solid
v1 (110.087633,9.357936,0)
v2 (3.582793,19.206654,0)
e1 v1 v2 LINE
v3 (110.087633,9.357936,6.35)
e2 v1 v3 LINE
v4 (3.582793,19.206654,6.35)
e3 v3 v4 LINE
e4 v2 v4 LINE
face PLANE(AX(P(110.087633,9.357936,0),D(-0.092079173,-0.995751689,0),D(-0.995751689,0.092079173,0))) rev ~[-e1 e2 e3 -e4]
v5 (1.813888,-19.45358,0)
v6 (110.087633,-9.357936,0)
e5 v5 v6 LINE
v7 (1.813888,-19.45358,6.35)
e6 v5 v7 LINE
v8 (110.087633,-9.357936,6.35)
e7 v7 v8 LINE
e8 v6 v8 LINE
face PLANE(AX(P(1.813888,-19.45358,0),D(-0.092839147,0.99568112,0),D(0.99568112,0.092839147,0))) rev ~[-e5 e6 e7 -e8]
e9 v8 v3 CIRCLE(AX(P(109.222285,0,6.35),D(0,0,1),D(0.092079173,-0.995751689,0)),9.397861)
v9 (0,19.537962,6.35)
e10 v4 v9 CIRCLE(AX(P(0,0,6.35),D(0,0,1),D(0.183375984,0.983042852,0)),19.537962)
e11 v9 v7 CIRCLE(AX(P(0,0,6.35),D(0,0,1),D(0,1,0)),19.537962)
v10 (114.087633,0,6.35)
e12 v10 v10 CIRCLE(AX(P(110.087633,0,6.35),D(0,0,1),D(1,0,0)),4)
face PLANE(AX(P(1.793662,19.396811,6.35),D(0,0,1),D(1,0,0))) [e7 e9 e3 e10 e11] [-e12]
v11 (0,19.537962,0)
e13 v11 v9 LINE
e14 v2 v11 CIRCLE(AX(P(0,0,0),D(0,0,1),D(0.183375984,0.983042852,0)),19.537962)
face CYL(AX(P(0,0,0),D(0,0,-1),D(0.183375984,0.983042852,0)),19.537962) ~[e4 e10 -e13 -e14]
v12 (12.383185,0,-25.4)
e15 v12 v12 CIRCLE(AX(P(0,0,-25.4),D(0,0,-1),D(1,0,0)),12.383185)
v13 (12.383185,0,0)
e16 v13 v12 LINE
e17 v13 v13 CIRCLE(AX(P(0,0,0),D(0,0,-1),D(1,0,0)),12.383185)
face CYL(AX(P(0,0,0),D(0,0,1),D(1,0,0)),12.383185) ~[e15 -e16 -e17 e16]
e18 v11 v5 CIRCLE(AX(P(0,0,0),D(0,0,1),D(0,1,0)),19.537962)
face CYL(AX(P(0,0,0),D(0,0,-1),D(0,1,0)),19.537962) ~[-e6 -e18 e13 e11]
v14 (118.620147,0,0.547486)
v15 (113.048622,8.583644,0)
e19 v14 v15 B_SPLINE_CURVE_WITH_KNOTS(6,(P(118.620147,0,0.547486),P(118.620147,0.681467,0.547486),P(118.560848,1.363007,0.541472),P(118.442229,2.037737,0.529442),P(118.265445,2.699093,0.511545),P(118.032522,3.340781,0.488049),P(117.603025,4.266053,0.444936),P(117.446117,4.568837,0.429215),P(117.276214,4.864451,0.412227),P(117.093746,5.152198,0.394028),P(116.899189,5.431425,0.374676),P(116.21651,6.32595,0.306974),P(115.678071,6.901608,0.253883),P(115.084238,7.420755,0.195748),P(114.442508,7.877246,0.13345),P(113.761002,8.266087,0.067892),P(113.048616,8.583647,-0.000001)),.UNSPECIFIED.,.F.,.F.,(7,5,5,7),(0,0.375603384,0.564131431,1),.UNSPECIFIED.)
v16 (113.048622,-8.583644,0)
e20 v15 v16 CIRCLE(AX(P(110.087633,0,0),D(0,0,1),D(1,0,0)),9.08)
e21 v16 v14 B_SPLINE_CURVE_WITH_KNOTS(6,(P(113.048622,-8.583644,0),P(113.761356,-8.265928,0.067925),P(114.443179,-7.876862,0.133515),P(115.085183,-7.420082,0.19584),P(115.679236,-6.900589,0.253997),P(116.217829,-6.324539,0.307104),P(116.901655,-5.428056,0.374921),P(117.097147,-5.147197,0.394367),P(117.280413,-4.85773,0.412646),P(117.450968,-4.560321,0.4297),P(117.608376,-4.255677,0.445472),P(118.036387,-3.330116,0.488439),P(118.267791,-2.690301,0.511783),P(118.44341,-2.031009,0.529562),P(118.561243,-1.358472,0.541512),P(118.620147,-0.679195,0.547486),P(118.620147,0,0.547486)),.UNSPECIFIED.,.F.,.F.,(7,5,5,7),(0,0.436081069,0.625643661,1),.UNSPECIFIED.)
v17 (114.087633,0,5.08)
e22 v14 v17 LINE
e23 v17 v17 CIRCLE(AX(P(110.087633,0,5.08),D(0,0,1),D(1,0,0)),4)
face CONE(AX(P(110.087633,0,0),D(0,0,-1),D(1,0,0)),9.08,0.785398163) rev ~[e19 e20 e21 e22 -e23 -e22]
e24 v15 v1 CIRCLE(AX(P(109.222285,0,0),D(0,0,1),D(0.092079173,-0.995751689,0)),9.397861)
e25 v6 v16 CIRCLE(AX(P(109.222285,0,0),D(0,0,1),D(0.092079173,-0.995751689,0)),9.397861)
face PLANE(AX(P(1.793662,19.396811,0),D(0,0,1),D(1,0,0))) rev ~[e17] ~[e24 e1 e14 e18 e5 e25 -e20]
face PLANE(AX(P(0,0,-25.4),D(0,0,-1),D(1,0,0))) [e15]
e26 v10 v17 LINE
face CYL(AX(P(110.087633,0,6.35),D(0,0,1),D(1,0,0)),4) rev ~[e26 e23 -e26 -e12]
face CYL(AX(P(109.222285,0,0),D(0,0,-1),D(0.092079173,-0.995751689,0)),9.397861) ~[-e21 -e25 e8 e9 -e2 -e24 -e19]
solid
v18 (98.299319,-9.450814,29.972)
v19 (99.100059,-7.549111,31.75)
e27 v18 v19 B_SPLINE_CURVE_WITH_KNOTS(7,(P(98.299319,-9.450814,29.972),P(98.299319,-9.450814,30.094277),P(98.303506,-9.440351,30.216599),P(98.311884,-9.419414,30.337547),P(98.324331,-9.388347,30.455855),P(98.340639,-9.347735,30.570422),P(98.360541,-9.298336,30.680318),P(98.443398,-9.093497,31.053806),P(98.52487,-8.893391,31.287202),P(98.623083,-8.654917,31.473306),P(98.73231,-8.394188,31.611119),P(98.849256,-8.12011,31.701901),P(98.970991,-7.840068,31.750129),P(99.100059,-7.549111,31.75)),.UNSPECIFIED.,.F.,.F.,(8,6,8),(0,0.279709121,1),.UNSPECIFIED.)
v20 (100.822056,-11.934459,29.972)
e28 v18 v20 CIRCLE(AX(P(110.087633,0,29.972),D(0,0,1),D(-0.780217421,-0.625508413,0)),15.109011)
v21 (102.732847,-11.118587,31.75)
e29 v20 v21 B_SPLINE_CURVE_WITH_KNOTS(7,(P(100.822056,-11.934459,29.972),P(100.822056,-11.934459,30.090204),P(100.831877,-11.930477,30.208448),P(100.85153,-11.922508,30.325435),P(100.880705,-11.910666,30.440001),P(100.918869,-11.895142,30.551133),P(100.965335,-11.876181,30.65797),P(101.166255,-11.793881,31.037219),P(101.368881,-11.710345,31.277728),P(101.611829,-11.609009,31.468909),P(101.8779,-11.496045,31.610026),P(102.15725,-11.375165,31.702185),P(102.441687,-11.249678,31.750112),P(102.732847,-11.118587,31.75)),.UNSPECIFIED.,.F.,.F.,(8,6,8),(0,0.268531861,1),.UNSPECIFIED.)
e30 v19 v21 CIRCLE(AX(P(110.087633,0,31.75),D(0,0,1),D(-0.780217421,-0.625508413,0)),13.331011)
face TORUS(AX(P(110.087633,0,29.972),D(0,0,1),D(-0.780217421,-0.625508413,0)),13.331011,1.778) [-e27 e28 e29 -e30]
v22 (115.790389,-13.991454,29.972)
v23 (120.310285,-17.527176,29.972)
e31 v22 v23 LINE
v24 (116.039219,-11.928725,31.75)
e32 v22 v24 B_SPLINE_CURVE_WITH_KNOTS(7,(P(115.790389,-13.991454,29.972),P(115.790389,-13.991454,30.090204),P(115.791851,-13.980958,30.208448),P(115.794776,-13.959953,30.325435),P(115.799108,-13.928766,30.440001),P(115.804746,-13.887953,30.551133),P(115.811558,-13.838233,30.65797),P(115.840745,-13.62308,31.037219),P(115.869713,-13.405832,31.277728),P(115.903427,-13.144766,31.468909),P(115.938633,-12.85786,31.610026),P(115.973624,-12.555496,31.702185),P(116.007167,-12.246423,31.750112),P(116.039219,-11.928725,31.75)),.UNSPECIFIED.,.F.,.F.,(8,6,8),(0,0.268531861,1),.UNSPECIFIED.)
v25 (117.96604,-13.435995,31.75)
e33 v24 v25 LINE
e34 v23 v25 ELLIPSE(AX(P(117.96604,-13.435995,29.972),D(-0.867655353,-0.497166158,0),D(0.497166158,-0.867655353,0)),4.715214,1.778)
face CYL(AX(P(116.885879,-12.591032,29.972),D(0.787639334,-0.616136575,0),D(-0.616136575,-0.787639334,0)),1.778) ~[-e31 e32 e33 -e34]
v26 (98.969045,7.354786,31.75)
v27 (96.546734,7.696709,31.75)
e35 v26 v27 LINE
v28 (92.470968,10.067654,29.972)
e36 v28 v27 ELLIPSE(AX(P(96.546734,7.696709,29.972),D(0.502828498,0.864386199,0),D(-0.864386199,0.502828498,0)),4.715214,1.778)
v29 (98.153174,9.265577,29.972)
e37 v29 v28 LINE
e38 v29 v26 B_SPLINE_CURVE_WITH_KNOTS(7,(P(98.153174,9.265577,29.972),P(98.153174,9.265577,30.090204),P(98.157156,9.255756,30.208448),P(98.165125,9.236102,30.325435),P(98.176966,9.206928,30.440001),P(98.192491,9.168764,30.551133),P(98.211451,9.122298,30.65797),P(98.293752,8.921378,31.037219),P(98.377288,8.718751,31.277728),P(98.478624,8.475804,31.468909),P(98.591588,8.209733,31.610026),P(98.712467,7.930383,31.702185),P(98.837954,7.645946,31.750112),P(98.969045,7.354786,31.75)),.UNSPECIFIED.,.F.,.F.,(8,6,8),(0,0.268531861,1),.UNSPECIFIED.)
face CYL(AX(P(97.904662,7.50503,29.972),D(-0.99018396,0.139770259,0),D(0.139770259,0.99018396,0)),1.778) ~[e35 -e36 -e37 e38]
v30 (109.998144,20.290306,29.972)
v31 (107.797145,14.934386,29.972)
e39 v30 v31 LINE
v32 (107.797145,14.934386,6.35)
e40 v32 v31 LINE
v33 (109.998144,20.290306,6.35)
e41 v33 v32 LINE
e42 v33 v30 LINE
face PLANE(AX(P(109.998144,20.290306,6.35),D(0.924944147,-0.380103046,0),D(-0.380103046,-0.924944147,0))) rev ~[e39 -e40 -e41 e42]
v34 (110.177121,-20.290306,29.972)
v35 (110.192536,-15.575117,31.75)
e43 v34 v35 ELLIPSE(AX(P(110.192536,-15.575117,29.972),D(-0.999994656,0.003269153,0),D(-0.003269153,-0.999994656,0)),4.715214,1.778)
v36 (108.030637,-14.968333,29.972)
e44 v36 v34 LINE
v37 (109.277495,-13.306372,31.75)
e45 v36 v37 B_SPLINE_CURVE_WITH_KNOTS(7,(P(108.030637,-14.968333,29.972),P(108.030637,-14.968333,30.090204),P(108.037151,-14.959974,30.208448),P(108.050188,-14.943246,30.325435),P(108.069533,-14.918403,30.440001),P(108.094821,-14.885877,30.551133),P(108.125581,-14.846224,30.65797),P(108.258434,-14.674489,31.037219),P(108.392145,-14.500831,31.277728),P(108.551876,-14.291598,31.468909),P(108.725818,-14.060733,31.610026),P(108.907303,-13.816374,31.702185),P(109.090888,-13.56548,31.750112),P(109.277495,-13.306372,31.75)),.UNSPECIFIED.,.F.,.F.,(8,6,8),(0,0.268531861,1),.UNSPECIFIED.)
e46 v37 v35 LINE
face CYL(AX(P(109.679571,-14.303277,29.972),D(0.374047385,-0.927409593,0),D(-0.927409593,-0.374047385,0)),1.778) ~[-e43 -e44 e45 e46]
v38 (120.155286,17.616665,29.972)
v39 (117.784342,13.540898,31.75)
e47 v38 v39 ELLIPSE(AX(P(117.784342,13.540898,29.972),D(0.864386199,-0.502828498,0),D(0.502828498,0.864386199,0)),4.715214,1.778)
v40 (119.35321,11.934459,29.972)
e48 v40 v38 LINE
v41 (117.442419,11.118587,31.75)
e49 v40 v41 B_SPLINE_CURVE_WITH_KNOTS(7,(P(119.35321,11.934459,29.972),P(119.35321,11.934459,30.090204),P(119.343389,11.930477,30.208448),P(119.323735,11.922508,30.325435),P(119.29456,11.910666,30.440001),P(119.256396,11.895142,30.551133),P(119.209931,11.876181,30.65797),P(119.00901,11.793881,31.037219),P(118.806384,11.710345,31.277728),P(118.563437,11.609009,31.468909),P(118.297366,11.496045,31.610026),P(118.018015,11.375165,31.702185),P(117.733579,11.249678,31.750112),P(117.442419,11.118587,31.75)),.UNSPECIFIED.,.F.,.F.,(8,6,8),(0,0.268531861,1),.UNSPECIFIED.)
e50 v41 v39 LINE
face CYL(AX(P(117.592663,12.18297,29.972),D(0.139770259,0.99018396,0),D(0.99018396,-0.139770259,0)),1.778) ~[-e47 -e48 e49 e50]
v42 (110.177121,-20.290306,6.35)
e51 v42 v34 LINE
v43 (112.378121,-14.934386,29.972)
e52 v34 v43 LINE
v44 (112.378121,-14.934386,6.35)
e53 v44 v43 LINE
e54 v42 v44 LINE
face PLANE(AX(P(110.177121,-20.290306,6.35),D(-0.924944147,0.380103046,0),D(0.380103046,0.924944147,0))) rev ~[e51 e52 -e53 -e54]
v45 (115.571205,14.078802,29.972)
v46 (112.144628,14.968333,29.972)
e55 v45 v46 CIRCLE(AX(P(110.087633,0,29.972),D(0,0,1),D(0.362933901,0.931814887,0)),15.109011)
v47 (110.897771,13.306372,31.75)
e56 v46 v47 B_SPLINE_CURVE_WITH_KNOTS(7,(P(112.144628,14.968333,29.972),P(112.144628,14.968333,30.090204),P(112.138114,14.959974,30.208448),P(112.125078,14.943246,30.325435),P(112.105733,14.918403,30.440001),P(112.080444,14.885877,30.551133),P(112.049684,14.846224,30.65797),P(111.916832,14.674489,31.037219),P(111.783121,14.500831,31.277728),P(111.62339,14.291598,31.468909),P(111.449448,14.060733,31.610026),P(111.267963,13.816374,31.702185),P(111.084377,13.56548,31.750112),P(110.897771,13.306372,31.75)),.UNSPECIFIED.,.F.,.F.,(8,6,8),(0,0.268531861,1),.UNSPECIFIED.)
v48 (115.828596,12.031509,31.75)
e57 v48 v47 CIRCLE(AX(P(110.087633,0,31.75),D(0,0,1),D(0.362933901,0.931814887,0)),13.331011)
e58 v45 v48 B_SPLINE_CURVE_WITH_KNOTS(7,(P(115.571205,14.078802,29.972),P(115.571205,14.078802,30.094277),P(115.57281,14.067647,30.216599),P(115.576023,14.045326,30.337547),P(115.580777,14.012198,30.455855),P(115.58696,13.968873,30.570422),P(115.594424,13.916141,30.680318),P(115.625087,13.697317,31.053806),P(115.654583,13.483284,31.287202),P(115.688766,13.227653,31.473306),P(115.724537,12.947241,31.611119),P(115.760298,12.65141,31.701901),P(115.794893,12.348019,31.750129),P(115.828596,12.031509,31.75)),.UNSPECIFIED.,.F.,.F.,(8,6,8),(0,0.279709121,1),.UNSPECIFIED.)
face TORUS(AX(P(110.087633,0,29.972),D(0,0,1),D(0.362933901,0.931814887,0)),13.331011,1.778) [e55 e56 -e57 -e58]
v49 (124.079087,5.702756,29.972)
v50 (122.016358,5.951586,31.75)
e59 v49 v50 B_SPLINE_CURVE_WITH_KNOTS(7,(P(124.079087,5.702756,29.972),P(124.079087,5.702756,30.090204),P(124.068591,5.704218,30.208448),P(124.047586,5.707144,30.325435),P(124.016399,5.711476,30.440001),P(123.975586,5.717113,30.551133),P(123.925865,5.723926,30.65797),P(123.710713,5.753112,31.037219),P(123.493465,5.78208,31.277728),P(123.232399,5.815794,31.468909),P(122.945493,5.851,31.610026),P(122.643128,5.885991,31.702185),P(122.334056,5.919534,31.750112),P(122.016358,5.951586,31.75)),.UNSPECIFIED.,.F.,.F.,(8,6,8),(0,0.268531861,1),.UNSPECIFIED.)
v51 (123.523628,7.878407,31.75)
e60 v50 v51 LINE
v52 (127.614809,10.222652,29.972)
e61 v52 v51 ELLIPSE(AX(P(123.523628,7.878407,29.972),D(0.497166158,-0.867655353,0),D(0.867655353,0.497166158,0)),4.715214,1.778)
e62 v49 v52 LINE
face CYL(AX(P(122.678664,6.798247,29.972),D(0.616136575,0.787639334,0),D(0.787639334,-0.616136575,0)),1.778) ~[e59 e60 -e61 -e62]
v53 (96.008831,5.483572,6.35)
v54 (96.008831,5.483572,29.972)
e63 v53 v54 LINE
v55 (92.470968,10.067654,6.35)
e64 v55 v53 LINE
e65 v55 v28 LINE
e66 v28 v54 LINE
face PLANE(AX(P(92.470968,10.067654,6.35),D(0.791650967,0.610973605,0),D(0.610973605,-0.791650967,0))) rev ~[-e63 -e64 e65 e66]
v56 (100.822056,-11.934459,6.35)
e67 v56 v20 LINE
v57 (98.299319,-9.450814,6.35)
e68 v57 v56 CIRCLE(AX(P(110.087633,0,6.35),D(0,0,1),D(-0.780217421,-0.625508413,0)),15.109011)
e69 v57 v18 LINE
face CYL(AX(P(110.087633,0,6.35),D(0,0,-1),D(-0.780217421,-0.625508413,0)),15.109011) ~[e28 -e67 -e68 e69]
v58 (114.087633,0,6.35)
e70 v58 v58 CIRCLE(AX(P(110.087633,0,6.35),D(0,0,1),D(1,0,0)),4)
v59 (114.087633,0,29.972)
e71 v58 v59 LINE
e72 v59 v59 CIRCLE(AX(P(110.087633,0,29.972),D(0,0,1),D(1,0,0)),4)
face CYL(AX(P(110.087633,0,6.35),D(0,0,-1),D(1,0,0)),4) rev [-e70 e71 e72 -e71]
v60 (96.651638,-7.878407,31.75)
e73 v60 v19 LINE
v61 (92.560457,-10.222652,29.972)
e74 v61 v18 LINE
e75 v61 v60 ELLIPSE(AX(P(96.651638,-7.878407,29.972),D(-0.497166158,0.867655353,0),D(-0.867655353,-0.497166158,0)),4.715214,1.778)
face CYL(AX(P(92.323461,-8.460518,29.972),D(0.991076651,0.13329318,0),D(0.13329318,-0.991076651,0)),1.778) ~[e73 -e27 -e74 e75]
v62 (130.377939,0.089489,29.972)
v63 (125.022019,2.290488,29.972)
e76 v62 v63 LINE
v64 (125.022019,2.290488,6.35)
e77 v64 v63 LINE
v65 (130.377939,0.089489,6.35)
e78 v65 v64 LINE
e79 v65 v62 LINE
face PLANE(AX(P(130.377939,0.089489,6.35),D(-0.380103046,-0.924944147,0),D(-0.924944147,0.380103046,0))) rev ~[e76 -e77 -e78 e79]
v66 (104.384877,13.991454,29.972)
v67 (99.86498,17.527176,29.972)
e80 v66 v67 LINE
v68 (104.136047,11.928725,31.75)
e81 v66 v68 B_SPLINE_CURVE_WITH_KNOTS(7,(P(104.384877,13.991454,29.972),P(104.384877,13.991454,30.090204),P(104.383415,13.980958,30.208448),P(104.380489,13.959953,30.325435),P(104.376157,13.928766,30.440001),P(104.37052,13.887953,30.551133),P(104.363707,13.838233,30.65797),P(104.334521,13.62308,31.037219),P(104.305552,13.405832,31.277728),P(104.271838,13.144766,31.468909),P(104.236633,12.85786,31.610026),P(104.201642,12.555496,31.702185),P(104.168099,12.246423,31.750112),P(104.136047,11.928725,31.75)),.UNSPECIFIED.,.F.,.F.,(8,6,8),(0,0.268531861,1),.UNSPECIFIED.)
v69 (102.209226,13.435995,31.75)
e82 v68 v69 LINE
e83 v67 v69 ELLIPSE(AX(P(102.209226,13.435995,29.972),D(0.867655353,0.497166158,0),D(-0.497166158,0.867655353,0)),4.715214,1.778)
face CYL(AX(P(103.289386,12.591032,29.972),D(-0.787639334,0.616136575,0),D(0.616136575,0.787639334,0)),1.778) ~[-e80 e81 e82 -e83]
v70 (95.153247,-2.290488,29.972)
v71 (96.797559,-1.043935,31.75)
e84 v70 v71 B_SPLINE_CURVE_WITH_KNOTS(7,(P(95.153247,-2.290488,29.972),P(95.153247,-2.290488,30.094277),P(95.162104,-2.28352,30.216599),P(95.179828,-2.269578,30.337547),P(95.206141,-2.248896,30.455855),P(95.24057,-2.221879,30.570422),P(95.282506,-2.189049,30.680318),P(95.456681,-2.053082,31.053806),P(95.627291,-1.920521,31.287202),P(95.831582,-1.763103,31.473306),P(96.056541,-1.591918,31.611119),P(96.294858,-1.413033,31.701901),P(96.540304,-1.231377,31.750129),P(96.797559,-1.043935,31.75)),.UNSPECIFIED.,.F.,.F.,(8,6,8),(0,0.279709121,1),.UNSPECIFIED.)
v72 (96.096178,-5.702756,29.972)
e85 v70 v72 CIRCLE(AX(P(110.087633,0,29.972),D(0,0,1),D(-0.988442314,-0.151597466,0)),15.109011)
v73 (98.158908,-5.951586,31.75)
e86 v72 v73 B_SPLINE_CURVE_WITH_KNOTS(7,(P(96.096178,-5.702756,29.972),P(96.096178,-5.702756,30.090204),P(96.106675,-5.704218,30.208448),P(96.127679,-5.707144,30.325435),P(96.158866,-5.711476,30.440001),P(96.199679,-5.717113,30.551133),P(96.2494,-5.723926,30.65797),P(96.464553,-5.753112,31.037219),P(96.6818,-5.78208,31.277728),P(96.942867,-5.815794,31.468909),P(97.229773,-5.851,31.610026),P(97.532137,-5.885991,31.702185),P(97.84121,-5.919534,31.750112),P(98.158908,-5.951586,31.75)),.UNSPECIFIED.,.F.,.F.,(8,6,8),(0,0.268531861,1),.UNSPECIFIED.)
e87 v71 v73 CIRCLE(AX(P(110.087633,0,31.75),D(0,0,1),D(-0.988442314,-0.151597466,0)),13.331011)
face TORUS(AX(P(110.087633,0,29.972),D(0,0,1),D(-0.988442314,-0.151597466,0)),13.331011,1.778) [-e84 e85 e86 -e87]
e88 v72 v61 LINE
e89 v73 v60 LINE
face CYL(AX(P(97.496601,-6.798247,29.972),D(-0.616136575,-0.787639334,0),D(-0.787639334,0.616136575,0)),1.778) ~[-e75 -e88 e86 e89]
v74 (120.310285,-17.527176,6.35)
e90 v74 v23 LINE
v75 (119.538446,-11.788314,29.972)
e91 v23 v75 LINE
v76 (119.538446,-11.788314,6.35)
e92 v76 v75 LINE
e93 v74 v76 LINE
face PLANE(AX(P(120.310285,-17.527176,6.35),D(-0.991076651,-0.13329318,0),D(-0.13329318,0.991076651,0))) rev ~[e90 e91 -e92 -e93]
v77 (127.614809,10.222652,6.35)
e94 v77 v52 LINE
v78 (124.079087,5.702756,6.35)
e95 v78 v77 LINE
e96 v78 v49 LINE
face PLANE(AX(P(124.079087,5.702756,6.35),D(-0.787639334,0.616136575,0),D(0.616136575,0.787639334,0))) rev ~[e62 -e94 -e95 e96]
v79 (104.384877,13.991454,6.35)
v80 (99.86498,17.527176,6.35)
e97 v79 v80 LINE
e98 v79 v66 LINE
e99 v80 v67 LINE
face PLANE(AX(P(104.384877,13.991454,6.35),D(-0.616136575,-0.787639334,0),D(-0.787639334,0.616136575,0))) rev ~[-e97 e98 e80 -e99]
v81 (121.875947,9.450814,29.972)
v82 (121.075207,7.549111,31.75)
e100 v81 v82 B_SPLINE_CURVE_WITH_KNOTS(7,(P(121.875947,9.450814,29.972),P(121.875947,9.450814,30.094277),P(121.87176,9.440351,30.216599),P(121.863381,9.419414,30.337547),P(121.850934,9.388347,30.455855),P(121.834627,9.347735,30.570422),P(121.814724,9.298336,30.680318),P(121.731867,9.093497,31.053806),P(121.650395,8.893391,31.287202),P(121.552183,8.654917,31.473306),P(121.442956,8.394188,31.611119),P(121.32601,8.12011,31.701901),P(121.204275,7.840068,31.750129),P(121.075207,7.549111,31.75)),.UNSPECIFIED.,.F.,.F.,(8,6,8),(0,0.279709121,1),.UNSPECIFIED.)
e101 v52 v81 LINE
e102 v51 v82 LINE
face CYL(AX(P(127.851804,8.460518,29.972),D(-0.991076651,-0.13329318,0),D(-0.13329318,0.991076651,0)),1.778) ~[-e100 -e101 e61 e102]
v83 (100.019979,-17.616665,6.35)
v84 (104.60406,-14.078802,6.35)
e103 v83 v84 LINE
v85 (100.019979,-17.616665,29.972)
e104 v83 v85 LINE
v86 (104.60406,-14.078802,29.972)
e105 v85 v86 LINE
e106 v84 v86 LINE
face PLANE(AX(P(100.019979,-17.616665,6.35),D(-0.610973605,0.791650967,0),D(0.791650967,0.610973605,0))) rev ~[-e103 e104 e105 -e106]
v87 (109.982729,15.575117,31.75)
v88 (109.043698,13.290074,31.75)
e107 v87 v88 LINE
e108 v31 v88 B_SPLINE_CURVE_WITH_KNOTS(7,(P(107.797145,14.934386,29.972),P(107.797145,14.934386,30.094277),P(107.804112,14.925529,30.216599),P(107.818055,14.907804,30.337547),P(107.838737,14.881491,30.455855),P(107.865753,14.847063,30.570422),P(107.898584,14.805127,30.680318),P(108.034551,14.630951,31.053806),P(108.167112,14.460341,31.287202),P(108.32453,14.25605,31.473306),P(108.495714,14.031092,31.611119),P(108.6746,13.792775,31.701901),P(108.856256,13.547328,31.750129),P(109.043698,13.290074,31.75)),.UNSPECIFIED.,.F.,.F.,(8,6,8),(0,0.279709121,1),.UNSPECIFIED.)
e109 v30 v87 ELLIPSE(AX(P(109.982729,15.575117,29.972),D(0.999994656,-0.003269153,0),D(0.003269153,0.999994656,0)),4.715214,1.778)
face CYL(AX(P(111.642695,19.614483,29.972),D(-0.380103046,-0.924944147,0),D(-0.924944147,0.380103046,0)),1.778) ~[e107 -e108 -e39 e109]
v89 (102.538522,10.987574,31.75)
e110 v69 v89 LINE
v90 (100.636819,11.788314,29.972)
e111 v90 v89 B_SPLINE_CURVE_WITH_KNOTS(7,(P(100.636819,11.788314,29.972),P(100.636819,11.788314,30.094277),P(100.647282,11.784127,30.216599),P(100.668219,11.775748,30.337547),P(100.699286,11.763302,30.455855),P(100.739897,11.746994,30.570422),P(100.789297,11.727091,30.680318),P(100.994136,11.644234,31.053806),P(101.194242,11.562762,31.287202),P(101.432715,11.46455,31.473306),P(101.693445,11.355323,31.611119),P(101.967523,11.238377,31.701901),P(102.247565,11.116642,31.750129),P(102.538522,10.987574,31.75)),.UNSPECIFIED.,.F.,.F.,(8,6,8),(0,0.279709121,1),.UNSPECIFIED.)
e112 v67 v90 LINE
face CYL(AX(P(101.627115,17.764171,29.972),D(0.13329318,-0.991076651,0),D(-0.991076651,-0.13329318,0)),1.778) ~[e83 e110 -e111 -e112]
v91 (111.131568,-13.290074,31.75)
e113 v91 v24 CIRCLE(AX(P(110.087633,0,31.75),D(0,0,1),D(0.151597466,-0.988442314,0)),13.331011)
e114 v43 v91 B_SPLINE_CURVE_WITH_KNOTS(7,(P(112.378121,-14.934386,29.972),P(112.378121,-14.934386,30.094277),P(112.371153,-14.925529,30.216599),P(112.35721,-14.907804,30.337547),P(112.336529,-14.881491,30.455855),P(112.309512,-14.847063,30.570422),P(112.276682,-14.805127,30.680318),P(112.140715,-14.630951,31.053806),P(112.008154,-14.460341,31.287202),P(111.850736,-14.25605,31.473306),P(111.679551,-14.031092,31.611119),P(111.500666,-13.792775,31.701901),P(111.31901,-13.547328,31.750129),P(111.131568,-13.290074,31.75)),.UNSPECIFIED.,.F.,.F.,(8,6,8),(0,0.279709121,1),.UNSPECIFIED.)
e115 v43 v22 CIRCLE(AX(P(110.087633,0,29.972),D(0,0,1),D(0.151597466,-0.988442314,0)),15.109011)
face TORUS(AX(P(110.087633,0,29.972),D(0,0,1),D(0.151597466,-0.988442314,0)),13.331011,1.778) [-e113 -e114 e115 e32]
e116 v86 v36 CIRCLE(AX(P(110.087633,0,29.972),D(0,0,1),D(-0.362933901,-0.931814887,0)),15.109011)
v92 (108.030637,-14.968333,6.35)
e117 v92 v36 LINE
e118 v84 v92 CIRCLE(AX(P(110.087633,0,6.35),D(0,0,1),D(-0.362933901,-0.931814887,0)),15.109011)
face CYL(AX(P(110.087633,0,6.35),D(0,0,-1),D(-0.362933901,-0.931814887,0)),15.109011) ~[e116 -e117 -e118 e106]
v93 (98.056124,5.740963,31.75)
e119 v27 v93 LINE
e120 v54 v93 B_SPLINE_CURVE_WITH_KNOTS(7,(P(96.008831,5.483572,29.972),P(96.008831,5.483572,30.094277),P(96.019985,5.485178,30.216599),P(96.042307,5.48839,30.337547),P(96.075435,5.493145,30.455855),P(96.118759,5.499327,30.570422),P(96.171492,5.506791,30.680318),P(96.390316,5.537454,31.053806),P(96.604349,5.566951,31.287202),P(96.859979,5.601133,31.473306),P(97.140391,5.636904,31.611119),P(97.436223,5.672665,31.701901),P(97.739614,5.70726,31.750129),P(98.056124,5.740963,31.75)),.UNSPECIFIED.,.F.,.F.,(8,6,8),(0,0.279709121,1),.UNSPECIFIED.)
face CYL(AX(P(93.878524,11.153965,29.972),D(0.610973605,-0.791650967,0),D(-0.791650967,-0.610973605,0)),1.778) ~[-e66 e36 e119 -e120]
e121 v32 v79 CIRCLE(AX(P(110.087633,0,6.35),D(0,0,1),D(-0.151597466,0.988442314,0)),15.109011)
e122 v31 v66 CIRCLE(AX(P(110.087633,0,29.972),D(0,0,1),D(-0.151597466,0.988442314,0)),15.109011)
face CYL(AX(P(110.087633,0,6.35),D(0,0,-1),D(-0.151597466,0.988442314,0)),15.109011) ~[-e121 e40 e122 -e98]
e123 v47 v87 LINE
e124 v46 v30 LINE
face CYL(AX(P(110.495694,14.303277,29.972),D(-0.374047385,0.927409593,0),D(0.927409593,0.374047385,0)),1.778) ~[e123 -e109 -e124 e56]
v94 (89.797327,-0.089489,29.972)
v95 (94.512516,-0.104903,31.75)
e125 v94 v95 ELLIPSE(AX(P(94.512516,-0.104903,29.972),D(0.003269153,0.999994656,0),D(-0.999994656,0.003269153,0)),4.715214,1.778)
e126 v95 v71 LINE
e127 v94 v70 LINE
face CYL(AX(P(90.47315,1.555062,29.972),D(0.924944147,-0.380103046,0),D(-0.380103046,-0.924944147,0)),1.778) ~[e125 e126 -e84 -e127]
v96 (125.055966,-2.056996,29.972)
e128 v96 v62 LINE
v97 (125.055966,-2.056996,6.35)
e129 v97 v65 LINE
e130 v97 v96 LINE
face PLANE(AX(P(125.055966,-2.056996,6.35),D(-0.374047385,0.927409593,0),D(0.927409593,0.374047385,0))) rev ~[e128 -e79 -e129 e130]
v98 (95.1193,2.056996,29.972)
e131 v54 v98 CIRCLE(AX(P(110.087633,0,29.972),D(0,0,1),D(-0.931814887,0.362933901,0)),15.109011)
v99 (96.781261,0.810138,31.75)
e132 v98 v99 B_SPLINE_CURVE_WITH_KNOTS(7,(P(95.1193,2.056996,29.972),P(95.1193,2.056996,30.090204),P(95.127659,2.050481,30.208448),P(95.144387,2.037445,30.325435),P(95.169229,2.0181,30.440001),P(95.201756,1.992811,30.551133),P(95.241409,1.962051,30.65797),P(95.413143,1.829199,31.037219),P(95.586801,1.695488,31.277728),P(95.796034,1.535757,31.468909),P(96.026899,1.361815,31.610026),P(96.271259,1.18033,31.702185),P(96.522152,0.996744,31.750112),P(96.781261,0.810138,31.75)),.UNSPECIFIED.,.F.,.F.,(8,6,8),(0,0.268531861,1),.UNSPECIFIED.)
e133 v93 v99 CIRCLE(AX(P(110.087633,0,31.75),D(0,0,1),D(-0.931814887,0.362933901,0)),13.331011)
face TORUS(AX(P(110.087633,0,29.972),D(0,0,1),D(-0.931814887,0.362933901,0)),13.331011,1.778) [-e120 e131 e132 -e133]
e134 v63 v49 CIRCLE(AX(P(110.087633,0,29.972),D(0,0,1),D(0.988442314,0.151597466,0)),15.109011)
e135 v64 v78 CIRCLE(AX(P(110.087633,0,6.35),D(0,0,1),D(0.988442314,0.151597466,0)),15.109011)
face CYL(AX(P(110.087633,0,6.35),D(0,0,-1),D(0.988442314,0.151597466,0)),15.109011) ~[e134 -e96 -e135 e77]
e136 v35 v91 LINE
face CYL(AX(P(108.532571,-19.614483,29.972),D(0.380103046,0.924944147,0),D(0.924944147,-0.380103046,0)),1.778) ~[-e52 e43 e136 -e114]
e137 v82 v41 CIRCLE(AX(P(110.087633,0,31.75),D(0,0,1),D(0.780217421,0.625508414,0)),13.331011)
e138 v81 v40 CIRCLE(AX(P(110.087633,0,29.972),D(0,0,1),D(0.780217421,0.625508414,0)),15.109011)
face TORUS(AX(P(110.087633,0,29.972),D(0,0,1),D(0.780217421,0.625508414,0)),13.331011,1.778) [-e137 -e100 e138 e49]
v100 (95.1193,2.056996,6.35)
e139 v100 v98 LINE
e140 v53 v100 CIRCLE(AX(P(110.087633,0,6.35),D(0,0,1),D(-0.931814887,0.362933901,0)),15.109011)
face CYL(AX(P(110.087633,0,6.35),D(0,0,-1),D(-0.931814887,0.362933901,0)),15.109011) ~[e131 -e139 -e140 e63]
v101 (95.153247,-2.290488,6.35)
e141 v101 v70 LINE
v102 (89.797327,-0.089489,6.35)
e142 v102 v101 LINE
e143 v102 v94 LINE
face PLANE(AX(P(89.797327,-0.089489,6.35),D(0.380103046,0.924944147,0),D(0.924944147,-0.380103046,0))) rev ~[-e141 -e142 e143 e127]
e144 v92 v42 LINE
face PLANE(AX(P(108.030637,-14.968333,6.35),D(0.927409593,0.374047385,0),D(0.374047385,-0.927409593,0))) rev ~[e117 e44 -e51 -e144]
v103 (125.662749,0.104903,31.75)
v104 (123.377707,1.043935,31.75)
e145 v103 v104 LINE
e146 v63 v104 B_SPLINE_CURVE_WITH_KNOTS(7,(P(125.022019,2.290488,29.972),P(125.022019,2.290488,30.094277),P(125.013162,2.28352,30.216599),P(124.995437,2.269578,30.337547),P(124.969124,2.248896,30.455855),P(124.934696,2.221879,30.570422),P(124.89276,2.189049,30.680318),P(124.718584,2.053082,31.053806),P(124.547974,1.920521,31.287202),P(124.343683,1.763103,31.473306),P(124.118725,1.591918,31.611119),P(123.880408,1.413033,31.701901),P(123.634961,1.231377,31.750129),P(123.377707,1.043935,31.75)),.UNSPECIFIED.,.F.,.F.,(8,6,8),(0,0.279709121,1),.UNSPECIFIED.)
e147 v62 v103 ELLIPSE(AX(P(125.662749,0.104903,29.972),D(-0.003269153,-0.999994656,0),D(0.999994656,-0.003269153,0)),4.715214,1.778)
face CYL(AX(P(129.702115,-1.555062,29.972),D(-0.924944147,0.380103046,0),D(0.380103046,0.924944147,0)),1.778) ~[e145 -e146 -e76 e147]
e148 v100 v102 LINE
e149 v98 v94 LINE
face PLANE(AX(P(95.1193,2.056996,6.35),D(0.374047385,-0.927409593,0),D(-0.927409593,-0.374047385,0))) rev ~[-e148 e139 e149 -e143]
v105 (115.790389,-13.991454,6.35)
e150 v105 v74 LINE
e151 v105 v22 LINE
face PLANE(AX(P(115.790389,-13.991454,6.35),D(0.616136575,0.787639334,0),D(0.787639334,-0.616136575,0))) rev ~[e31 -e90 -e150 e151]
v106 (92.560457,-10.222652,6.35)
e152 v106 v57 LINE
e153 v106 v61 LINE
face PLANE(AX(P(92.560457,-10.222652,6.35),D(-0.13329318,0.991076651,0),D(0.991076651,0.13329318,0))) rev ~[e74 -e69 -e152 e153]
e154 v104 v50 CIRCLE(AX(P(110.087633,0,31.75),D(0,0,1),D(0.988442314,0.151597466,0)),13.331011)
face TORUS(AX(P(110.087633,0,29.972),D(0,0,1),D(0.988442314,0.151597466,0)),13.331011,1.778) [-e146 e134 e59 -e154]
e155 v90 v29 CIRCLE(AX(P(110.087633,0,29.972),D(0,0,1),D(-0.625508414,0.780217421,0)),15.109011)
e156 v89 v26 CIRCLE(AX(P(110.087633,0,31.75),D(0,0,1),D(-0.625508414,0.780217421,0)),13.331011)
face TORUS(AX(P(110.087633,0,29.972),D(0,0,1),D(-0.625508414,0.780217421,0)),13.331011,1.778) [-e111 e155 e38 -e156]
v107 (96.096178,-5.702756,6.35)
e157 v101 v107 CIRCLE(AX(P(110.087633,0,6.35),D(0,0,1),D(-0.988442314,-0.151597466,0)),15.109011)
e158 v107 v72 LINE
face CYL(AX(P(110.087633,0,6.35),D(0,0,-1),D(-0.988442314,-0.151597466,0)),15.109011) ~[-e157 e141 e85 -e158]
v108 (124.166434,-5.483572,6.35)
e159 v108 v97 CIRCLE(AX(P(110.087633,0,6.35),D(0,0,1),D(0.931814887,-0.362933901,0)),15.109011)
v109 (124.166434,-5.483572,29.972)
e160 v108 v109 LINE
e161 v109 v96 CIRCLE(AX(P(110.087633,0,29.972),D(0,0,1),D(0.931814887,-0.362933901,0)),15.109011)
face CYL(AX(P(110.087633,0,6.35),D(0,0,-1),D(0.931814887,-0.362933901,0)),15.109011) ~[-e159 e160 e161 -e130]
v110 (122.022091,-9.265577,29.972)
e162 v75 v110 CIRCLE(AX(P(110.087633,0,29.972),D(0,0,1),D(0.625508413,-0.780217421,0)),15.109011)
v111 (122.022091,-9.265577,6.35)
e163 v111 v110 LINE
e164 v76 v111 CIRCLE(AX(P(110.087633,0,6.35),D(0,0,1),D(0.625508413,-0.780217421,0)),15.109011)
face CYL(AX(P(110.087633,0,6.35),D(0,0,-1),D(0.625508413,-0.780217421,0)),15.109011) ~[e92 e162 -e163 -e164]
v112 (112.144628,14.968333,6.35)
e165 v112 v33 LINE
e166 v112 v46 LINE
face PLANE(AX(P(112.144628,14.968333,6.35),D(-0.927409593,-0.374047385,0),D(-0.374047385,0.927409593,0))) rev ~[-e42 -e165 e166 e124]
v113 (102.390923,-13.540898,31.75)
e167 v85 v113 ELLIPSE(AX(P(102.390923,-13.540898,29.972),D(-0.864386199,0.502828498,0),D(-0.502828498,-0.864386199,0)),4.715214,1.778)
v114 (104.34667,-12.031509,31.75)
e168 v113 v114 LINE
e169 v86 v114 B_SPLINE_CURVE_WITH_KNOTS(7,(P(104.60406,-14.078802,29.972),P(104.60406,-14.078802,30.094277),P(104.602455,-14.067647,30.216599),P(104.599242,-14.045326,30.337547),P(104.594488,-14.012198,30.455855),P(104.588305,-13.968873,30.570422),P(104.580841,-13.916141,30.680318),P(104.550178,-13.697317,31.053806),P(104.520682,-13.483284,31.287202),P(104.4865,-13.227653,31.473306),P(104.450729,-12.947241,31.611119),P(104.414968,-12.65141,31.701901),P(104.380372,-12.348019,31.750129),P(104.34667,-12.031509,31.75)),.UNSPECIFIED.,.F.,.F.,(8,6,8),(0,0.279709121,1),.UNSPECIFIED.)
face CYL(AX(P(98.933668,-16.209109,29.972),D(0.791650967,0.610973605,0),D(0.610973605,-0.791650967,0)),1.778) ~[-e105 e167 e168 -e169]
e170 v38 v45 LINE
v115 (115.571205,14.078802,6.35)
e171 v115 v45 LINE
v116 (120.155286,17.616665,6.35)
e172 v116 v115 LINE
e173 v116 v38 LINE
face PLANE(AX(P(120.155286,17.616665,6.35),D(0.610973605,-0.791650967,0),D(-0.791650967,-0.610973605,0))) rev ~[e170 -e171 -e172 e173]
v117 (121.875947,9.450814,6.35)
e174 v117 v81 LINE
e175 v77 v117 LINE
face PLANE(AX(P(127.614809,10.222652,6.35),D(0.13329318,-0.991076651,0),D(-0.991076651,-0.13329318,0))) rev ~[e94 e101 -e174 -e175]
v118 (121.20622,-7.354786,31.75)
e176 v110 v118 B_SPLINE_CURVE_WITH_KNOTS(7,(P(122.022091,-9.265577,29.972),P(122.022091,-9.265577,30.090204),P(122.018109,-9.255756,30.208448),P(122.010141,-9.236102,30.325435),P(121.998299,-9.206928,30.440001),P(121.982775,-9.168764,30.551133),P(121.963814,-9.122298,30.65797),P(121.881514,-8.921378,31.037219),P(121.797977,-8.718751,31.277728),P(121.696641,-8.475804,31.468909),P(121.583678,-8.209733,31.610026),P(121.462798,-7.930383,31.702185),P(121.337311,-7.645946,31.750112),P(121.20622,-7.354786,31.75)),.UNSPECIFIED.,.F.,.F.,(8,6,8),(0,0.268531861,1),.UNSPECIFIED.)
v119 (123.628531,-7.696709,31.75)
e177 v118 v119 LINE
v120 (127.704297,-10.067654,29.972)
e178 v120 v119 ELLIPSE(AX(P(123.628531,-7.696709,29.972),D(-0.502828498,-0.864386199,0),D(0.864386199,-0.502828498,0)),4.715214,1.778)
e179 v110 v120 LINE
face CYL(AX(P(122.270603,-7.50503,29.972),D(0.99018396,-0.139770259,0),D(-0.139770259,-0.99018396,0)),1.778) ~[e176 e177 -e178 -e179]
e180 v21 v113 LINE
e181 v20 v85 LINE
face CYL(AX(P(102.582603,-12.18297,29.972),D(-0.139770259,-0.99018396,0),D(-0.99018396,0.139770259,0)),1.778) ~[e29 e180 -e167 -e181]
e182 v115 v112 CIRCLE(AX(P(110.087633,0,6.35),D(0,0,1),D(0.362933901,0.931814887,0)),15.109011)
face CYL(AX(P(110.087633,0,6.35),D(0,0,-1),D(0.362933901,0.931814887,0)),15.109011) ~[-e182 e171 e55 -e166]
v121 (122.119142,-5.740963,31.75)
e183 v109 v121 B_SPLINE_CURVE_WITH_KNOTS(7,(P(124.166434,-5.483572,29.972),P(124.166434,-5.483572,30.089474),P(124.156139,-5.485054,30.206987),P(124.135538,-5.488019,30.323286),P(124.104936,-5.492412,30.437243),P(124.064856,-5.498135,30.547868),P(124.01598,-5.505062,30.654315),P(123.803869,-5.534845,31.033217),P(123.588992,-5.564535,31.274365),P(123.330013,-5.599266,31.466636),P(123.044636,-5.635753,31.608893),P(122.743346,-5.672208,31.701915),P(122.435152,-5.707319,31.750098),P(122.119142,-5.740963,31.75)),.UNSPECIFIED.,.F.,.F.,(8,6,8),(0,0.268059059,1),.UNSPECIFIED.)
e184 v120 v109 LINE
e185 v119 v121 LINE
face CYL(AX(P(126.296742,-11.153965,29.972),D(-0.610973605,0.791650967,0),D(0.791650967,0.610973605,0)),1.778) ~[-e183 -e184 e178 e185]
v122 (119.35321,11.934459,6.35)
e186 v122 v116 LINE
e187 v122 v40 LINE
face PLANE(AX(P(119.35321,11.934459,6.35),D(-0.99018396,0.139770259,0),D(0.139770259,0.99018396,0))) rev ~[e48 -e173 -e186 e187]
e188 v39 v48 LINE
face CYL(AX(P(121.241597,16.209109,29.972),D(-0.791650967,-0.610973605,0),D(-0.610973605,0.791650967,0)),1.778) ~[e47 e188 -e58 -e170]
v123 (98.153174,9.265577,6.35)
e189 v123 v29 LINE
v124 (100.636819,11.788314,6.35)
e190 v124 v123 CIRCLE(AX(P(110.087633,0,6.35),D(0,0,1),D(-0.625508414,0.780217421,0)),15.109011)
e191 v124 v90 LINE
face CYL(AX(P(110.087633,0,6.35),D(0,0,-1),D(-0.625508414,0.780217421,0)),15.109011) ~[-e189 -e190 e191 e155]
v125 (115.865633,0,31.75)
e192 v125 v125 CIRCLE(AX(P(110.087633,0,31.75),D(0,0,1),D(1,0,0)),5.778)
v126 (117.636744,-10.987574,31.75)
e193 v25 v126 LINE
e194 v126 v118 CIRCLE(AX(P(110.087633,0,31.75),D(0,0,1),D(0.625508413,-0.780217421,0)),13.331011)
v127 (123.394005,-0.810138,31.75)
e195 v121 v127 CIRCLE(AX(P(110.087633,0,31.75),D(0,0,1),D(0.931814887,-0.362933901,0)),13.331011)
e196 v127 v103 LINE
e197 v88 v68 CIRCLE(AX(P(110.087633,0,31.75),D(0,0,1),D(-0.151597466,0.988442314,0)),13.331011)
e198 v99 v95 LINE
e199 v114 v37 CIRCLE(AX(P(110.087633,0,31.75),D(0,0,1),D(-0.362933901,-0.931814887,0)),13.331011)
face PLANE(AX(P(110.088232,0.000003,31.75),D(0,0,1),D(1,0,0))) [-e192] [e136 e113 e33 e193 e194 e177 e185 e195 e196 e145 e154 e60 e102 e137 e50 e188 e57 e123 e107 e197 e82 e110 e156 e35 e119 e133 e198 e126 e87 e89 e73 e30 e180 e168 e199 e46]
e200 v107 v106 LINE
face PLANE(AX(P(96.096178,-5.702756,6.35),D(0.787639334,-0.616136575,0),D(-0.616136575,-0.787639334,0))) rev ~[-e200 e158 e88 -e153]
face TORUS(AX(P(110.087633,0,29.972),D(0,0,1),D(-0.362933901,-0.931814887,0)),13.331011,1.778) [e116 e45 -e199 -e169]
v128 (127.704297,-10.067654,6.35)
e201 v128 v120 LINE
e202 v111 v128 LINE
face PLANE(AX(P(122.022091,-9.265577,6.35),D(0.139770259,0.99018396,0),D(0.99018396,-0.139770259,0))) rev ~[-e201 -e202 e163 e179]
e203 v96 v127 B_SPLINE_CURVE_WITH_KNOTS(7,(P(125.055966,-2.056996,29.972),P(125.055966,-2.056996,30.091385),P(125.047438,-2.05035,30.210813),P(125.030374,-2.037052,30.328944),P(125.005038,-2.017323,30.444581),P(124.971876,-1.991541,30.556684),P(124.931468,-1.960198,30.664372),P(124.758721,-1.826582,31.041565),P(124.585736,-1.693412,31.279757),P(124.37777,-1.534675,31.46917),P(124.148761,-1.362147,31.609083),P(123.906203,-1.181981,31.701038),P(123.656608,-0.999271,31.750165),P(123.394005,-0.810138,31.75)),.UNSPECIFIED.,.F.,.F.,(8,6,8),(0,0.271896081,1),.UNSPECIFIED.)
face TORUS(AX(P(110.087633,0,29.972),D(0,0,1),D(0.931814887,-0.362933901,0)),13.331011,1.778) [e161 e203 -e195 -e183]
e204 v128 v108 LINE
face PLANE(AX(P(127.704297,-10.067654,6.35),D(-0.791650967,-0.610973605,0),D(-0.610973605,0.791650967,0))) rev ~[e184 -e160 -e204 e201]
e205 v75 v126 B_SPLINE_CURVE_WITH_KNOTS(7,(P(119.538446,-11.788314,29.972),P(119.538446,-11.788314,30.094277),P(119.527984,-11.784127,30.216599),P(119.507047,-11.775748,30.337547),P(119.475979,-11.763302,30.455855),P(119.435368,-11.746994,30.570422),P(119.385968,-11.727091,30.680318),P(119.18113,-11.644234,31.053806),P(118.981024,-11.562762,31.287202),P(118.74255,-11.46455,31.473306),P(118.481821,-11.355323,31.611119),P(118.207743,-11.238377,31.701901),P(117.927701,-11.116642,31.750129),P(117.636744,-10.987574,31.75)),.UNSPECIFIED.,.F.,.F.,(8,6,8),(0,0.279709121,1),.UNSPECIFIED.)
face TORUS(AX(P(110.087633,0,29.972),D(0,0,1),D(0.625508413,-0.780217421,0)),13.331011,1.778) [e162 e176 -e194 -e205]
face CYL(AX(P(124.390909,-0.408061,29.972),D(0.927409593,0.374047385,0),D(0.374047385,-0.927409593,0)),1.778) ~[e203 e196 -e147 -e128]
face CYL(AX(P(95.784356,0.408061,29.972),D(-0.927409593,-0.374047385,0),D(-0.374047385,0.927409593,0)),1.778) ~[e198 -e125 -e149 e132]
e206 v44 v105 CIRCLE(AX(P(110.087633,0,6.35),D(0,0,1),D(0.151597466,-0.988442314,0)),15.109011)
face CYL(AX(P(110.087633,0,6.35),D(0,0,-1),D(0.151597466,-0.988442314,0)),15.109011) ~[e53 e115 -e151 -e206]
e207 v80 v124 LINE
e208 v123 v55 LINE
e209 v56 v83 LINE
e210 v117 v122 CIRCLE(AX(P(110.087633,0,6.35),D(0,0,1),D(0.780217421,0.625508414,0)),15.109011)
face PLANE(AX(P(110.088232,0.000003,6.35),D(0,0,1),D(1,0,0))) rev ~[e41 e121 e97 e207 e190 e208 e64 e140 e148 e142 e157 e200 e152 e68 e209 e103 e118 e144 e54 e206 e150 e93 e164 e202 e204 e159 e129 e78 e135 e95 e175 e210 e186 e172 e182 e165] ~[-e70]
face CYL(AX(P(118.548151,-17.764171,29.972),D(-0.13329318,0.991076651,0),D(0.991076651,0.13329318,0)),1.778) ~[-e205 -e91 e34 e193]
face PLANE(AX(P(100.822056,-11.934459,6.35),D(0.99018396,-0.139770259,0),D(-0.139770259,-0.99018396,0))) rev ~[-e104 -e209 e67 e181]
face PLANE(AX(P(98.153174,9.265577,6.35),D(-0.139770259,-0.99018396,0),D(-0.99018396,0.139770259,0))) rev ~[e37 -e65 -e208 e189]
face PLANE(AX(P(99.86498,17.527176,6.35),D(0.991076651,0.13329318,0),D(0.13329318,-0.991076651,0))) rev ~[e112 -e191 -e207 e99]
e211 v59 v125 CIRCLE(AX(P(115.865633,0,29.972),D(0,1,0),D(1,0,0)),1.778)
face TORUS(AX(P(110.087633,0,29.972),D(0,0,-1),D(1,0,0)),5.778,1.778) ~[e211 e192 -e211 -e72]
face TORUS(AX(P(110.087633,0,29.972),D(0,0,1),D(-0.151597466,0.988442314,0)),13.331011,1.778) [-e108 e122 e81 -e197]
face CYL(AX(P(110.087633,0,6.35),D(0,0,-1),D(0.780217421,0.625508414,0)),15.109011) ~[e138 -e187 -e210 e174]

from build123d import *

# Parameters (mm, degrees)
F1_DEPTH = 6.35
F2_R     = 4
F3_DEPTH = 25.4
F5_R     = 12.3831854663
F6_DEPTH = 25.4
F7_R     = 4
F8_DEPTH = 25.4
F9_R     = 1.778


# Not quite as in the source:
# - a fillet or chamfer that OpenCascade refuses, or shapes differently, is made with other operations: its cross-section is extruded or revolved along the edge and cut away or added


with BuildPart() as f1:
    # F0 (on Top) → F1 (new body)
    with BuildSketch(Plane.XY):
        with BuildLine():
            Line((0, 19.5379621843), (3.5827930435, 19.2066540637))
            ThreePointArc((3.5827930435, 19.2066540637), (1.7990394008, 19.4549588422), (0, 19.5379621843))
        make_face()
        with BuildLine():
            Line((110.0876327298, 9.3579360824), (3.5827930435, 19.2066540637))
            Line((3.5827930435, 19.2066540637), (0, 19.5379621843))
            ThreePointArc((0, 19.5379621843), (-19.5168552551, -0.9079247047), (1.813887741, -19.453580071))
            Line((1.8138877409, -19.453580071), (110.0876327298, -9.3579360824))
            ThreePointArc((110.0876327298, -9.3579360824), (118.6201465698, 0), (110.0876327298, 9.3579360824))
        make_face()
    extrude(amount=F1_DEPTH)

    # F2 (on face) → F3 (cut)
    with BuildSketch(Plane.XY.offset(6.35)):
        with Locations((110.0876327298, 0)):
            Circle(F2_R)
    extrude(amount=-F3_DEPTH, mode=Mode.SUBTRACT)

    # F4: chamfer of 5.08 on 1 edges, made by hand

    # F4_s1 → F4_t2 (revolve, cut)
    with BuildSketch(Plane.XZ):
        Polygon((119.1676327298, 0), (114.0876327298, 5.08), (114.0876327298, 0), align=None)
    revolve(axis=Axis((110.0876327298, 0, 0), (0, 0, 1)), mode=Mode.SUBTRACT)

    # F5 (on face) → F6 (join)
    with BuildSketch(Plane(origin=(0, 0, 0), x_dir=(1, 0, 0), z_dir=(0, 0, -1))):
        Circle(F5_R)
    extrude(amount=F6_DEPTH)


with BuildPart() as f8:
    # F7 (on face) → F8 (new body)
    with BuildSketch(Plane.XY.offset(6.35)):
        with BuildLine():
            ThreePointArc((125.0559656513, -2.0569956955), (125.1614333891, -1.0309002972), (125.1966440058, 0))
            ThreePointArc((125.1966440058, 0), (125.1529244508, 1.1485674127), (125.0220188001, 2.2904878178))
            ThreePointArc((125.0220188001, 2.2904878178), (124.6508382593, 4.0243342858), (124.0790871399, 5.7027559329))
            ThreePointArc((124.0790871399, 5.7027559329), (123.1130347073, 7.656443369), (121.8759465477, 9.4508136724))
            ThreePointArc((121.8759465477, 9.4508136724), (120.687571536, 10.7667784895), (119.3532097183, 11.9344587145))
            ThreePointArc((119.3532097183, 11.9344587145), (117.5397400523, 13.143375449), (115.5712051277, 14.0788016356))
            ThreePointArc((115.5712051277, 14.0788016356), (113.8840597698, 14.624273092), (112.1446284253, 14.9683329214))
            ThreePointArc((112.1446284253, 14.9683329214), (109.9696592584, 15.1085506915), (107.797144912, 14.9343860702))
            ThreePointArc((107.797144912, 14.9343860702), (106.0632984441, 14.5632055295), (104.3848767969, 13.99145441))
            ThreePointArc((104.3848767969, 13.99145441), (102.4311893608, 13.0254019775), (100.6368190574, 11.7883138179))
            ThreePointArc((100.6368190574, 11.7883138179), (99.3208542403, 10.5999388062), (98.1531740153, 9.2655769885))
            ThreePointArc((98.1531740153, 9.2655769885), (96.9442572809, 7.4521073225), (96.0088310942, 5.4835723979))
            ThreePointArc((96.0088310942, 5.4835723979), (95.4633596378, 3.79642704), (95.1192998084, 2.0569956955))
            ThreePointArc((95.1192998084, 2.0569956955), (94.9790820383, -0.1179734715), (95.1532466596, -2.2904878178))
            ThreePointArc((95.1532466596, -2.2904878178), (95.5244272003, -4.0243342858), (96.0961783198, -5.7027559329))
            ThreePointArc((96.0961783198, -5.7027559329), (97.0622307523, -7.656443369), (98.299318912, -9.4508136724))
            ThreePointArc((98.299318912, -9.4508136724), (99.4876939236, -10.7667784895), (100.8220557413, -11.9344587145))
            ThreePointArc((100.8220557413, -11.9344587145), (102.6355254073, -13.143375449), (104.604060332, -14.0788016356))
            ThreePointArc((104.604060332, -14.0788016356), (106.2912056898, -14.624273092), (108.0306370343, -14.9683329214))
            ThreePointArc((108.0306370343, -14.9683329214), (110.2056062013, -15.1085506915), (112.3781205476, -14.9343860702))
            ThreePointArc((112.3781205476, -14.9343860702), (114.1119670156, -14.5632055295), (115.7903886627, -13.99145441))
            ThreePointArc((115.7903886627, -13.99145441), (117.7440760988, -13.0254019775), (119.5384464022, -11.7883138179))
            ThreePointArc((119.5384464022, -11.7883138179), (120.8544112194, -10.5999388062), (122.0220914443, -9.2655769885))
            ThreePointArc((122.0220914443, -9.2655769885), (123.2310081788, -7.4521073225), (124.1664343655, -5.4835723979))
            ThreePointArc((124.1664343655, -5.4835723979), (124.7119058218, -3.79642704), (125.0559656513, -2.0569956955))
        make_face()
        with Locations((110.0876327298, 0)):
            Circle(F7_R, mode=Mode.SUBTRACT)
        with BuildLine():
            ThreePointArc((125.0220188001, 2.2904878178), (125.1529244508, 1.1485674127), (125.1966440058, 0))
            ThreePointArc((125.1966440058, 0), (125.1614333891, -1.0309002972), (125.0559656513, -2.0569956955))
            Line((125.0559656513, -2.0569956955), (130.3779385678, 0.0894885204))
            Line((130.3779385678, 0.0894885204), (125.0220188001, 2.2904878178))
        make_face()
        with BuildLine():
            ThreePointArc((121.8759465477, 9.4508136724), (123.1130347073, 7.656443369), (124.0790871399, 5.7027559329))
            Line((124.0790871399, 5.7027559329), (127.6148087759, 10.222652251))
            Line((127.6148087759, 10.222652251), (121.8759465477, 9.4508136724))
        make_face()
        with BuildLine():
            Line((127.7042972963, -10.067653587), (124.1664343655, -5.4835723979))
            ThreePointArc((124.1664343655, -5.4835723979), (123.2310081788, -7.4521073225), (122.0220914443, -9.2655769885))
            Line((122.0220914443, -9.2655769885), (127.7042972963, -10.067653587))
        make_face()
        with BuildLine():
            ThreePointArc((115.5712051277, 14.0788016356), (117.5397400523, 13.143375449), (119.3532097183, 11.9344587145))
            Line((119.3532097183, 11.9344587145), (120.1552863168, 17.6166645665))
            Line((120.1552863168, 17.6166645665), (115.5712051277, 14.0788016356))
        make_face()
        with BuildLine():
            Line((120.3102849809, -17.527176046), (119.5384464022, -11.7883138179))
            ThreePointArc((119.5384464022, -11.7883138179), (117.7440760988, -13.0254019775), (115.7903886627, -13.99145441))
            Line((115.7903886627, -13.99145441), (120.3102849809, -17.527176046))
        make_face()
        with BuildLine():
            ThreePointArc((107.797144912, 14.9343860702), (109.9696592584, 15.1085506915), (112.1446284253, 14.9683329214))
            Line((112.1446284253, 14.9683329214), (109.9981442094, 20.290305838))
            Line((109.9981442094, 20.290305838), (107.797144912, 14.9343860702))
        make_face()
        with BuildLine():
            Line((110.1771212503, -20.290305838), (112.3781205476, -14.9343860702))
            ThreePointArc((112.3781205476, -14.9343860702), (110.2056062013, -15.1085506915), (108.0306370343, -14.9683329214))
            Line((108.0306370343, -14.9683329214), (110.1771212503, -20.290305838))
        make_face()
        with BuildLine():
            ThreePointArc((100.6368190574, 11.7883138179), (102.4311893608, 13.0254019775), (104.3848767969, 13.99145441))
            Line((104.3848767969, 13.99145441), (99.8649804788, 17.527176046))
            Line((99.8649804788, 17.527176046), (100.6368190574, 11.7883138179))
        make_face()
        with BuildLine():
            Line((100.0199791429, -17.6166645665), (104.604060332, -14.0788016356))
            ThreePointArc((104.604060332, -14.0788016356), (102.6355254073, -13.143375449), (100.8220557413, -11.9344587145))
            Line((100.8220557413, -11.9344587145), (100.0199791429, -17.6166645665))
        make_face()
        with BuildLine():
            ThreePointArc((96.0088310942, 5.4835723979), (96.9442572809, 7.4521073225), (98.1531740153, 9.2655769885))
            Line((98.1531740153, 9.2655769885), (92.4709681633, 10.067653587))
            Line((92.4709681633, 10.067653587), (96.0088310942, 5.4835723979))
        make_face()
        with BuildLine():
            Line((92.5604566838, -10.222652251), (98.299318912, -9.4508136724))
            ThreePointArc((98.299318912, -9.4508136724), (97.0622307523, -7.656443369), (96.0961783198, -5.7027559329))
            Line((96.0961783198, -5.7027559329), (92.5604566838, -10.222652251))
        make_face()
        with BuildLine():
            ThreePointArc((95.1532466596, -2.2904878178), (94.9790820383, -0.1179734715), (95.1192998084, 2.0569956955))
            Line((95.1192998084, 2.0569956955), (89.7973268918, -0.0894885204))
            Line((89.7973268918, -0.0894885204), (95.1532466596, -2.2904878178))
        make_face()
    extrude(amount=F8_DEPTH)

    # F9
    f9_edges = [f8.edges().sort_by_distance(p)[0] for p in [
        (127.716952, -0.983754, 31.75),
        (127.699979, 1.189988, 31.75),
        (124.650838, 4.024334, 31.75),
        (125.846948, 7.962704, 31.75),
        (124.745378, 9.836733, 31.75),
        (120.687572, 10.766778, 31.75),
        (119.754248, 14.775562, 31.75),
        (117.863246, 15.847733, 31.75),
        (113.88406, 14.624273, 31.75),
        (111.071386, 17.629319, 31.75),
        (108.897645, 17.612346, 31.75),
        (106.063298, 14.563206, 31.75),
        (102.124929, 15.759315, 31.75),
        (100.2509, 14.657745, 31.75),
        (99.320854, 10.599939, 31.75),
        (95.312071, 9.666615, 31.75),
        (94.2399, 7.775613, 31.75),
        (95.46336, 3.796427, 31.75),
        (92.458313, 0.983754, 31.75),
        (92.475287, -1.189988, 31.75),
        (95.524427, -4.024334, 31.75),
        (94.328318, -7.962704, 31.75),
        (95.429888, -9.836733, 31.75),
        (99.487694, -10.766778, 31.75),
        (100.421017, -14.775562, 31.75),
        (102.31202, -15.847733, 31.75),
        (106.291206, -14.624273, 31.75),
        (109.103879, -17.629319, 31.75),
        (111.277621, -17.612346, 31.75),
        (114.111967, -14.563206, 31.75),
        (118.050337, -15.759315, 31.75),
        (119.924366, -14.657745, 31.75),
        (120.854411, -10.599939, 31.75),
        (124.863194, -9.666615, 31.75),
        (125.935366, -7.775613, 31.75),
        (124.711906, -3.796427, 31.75),
        (106.087633, 0, 31.75),
    ]]
    fillet(f9_edges, radius=F9_R)


solid = Compound([f1.part, f8.part])
